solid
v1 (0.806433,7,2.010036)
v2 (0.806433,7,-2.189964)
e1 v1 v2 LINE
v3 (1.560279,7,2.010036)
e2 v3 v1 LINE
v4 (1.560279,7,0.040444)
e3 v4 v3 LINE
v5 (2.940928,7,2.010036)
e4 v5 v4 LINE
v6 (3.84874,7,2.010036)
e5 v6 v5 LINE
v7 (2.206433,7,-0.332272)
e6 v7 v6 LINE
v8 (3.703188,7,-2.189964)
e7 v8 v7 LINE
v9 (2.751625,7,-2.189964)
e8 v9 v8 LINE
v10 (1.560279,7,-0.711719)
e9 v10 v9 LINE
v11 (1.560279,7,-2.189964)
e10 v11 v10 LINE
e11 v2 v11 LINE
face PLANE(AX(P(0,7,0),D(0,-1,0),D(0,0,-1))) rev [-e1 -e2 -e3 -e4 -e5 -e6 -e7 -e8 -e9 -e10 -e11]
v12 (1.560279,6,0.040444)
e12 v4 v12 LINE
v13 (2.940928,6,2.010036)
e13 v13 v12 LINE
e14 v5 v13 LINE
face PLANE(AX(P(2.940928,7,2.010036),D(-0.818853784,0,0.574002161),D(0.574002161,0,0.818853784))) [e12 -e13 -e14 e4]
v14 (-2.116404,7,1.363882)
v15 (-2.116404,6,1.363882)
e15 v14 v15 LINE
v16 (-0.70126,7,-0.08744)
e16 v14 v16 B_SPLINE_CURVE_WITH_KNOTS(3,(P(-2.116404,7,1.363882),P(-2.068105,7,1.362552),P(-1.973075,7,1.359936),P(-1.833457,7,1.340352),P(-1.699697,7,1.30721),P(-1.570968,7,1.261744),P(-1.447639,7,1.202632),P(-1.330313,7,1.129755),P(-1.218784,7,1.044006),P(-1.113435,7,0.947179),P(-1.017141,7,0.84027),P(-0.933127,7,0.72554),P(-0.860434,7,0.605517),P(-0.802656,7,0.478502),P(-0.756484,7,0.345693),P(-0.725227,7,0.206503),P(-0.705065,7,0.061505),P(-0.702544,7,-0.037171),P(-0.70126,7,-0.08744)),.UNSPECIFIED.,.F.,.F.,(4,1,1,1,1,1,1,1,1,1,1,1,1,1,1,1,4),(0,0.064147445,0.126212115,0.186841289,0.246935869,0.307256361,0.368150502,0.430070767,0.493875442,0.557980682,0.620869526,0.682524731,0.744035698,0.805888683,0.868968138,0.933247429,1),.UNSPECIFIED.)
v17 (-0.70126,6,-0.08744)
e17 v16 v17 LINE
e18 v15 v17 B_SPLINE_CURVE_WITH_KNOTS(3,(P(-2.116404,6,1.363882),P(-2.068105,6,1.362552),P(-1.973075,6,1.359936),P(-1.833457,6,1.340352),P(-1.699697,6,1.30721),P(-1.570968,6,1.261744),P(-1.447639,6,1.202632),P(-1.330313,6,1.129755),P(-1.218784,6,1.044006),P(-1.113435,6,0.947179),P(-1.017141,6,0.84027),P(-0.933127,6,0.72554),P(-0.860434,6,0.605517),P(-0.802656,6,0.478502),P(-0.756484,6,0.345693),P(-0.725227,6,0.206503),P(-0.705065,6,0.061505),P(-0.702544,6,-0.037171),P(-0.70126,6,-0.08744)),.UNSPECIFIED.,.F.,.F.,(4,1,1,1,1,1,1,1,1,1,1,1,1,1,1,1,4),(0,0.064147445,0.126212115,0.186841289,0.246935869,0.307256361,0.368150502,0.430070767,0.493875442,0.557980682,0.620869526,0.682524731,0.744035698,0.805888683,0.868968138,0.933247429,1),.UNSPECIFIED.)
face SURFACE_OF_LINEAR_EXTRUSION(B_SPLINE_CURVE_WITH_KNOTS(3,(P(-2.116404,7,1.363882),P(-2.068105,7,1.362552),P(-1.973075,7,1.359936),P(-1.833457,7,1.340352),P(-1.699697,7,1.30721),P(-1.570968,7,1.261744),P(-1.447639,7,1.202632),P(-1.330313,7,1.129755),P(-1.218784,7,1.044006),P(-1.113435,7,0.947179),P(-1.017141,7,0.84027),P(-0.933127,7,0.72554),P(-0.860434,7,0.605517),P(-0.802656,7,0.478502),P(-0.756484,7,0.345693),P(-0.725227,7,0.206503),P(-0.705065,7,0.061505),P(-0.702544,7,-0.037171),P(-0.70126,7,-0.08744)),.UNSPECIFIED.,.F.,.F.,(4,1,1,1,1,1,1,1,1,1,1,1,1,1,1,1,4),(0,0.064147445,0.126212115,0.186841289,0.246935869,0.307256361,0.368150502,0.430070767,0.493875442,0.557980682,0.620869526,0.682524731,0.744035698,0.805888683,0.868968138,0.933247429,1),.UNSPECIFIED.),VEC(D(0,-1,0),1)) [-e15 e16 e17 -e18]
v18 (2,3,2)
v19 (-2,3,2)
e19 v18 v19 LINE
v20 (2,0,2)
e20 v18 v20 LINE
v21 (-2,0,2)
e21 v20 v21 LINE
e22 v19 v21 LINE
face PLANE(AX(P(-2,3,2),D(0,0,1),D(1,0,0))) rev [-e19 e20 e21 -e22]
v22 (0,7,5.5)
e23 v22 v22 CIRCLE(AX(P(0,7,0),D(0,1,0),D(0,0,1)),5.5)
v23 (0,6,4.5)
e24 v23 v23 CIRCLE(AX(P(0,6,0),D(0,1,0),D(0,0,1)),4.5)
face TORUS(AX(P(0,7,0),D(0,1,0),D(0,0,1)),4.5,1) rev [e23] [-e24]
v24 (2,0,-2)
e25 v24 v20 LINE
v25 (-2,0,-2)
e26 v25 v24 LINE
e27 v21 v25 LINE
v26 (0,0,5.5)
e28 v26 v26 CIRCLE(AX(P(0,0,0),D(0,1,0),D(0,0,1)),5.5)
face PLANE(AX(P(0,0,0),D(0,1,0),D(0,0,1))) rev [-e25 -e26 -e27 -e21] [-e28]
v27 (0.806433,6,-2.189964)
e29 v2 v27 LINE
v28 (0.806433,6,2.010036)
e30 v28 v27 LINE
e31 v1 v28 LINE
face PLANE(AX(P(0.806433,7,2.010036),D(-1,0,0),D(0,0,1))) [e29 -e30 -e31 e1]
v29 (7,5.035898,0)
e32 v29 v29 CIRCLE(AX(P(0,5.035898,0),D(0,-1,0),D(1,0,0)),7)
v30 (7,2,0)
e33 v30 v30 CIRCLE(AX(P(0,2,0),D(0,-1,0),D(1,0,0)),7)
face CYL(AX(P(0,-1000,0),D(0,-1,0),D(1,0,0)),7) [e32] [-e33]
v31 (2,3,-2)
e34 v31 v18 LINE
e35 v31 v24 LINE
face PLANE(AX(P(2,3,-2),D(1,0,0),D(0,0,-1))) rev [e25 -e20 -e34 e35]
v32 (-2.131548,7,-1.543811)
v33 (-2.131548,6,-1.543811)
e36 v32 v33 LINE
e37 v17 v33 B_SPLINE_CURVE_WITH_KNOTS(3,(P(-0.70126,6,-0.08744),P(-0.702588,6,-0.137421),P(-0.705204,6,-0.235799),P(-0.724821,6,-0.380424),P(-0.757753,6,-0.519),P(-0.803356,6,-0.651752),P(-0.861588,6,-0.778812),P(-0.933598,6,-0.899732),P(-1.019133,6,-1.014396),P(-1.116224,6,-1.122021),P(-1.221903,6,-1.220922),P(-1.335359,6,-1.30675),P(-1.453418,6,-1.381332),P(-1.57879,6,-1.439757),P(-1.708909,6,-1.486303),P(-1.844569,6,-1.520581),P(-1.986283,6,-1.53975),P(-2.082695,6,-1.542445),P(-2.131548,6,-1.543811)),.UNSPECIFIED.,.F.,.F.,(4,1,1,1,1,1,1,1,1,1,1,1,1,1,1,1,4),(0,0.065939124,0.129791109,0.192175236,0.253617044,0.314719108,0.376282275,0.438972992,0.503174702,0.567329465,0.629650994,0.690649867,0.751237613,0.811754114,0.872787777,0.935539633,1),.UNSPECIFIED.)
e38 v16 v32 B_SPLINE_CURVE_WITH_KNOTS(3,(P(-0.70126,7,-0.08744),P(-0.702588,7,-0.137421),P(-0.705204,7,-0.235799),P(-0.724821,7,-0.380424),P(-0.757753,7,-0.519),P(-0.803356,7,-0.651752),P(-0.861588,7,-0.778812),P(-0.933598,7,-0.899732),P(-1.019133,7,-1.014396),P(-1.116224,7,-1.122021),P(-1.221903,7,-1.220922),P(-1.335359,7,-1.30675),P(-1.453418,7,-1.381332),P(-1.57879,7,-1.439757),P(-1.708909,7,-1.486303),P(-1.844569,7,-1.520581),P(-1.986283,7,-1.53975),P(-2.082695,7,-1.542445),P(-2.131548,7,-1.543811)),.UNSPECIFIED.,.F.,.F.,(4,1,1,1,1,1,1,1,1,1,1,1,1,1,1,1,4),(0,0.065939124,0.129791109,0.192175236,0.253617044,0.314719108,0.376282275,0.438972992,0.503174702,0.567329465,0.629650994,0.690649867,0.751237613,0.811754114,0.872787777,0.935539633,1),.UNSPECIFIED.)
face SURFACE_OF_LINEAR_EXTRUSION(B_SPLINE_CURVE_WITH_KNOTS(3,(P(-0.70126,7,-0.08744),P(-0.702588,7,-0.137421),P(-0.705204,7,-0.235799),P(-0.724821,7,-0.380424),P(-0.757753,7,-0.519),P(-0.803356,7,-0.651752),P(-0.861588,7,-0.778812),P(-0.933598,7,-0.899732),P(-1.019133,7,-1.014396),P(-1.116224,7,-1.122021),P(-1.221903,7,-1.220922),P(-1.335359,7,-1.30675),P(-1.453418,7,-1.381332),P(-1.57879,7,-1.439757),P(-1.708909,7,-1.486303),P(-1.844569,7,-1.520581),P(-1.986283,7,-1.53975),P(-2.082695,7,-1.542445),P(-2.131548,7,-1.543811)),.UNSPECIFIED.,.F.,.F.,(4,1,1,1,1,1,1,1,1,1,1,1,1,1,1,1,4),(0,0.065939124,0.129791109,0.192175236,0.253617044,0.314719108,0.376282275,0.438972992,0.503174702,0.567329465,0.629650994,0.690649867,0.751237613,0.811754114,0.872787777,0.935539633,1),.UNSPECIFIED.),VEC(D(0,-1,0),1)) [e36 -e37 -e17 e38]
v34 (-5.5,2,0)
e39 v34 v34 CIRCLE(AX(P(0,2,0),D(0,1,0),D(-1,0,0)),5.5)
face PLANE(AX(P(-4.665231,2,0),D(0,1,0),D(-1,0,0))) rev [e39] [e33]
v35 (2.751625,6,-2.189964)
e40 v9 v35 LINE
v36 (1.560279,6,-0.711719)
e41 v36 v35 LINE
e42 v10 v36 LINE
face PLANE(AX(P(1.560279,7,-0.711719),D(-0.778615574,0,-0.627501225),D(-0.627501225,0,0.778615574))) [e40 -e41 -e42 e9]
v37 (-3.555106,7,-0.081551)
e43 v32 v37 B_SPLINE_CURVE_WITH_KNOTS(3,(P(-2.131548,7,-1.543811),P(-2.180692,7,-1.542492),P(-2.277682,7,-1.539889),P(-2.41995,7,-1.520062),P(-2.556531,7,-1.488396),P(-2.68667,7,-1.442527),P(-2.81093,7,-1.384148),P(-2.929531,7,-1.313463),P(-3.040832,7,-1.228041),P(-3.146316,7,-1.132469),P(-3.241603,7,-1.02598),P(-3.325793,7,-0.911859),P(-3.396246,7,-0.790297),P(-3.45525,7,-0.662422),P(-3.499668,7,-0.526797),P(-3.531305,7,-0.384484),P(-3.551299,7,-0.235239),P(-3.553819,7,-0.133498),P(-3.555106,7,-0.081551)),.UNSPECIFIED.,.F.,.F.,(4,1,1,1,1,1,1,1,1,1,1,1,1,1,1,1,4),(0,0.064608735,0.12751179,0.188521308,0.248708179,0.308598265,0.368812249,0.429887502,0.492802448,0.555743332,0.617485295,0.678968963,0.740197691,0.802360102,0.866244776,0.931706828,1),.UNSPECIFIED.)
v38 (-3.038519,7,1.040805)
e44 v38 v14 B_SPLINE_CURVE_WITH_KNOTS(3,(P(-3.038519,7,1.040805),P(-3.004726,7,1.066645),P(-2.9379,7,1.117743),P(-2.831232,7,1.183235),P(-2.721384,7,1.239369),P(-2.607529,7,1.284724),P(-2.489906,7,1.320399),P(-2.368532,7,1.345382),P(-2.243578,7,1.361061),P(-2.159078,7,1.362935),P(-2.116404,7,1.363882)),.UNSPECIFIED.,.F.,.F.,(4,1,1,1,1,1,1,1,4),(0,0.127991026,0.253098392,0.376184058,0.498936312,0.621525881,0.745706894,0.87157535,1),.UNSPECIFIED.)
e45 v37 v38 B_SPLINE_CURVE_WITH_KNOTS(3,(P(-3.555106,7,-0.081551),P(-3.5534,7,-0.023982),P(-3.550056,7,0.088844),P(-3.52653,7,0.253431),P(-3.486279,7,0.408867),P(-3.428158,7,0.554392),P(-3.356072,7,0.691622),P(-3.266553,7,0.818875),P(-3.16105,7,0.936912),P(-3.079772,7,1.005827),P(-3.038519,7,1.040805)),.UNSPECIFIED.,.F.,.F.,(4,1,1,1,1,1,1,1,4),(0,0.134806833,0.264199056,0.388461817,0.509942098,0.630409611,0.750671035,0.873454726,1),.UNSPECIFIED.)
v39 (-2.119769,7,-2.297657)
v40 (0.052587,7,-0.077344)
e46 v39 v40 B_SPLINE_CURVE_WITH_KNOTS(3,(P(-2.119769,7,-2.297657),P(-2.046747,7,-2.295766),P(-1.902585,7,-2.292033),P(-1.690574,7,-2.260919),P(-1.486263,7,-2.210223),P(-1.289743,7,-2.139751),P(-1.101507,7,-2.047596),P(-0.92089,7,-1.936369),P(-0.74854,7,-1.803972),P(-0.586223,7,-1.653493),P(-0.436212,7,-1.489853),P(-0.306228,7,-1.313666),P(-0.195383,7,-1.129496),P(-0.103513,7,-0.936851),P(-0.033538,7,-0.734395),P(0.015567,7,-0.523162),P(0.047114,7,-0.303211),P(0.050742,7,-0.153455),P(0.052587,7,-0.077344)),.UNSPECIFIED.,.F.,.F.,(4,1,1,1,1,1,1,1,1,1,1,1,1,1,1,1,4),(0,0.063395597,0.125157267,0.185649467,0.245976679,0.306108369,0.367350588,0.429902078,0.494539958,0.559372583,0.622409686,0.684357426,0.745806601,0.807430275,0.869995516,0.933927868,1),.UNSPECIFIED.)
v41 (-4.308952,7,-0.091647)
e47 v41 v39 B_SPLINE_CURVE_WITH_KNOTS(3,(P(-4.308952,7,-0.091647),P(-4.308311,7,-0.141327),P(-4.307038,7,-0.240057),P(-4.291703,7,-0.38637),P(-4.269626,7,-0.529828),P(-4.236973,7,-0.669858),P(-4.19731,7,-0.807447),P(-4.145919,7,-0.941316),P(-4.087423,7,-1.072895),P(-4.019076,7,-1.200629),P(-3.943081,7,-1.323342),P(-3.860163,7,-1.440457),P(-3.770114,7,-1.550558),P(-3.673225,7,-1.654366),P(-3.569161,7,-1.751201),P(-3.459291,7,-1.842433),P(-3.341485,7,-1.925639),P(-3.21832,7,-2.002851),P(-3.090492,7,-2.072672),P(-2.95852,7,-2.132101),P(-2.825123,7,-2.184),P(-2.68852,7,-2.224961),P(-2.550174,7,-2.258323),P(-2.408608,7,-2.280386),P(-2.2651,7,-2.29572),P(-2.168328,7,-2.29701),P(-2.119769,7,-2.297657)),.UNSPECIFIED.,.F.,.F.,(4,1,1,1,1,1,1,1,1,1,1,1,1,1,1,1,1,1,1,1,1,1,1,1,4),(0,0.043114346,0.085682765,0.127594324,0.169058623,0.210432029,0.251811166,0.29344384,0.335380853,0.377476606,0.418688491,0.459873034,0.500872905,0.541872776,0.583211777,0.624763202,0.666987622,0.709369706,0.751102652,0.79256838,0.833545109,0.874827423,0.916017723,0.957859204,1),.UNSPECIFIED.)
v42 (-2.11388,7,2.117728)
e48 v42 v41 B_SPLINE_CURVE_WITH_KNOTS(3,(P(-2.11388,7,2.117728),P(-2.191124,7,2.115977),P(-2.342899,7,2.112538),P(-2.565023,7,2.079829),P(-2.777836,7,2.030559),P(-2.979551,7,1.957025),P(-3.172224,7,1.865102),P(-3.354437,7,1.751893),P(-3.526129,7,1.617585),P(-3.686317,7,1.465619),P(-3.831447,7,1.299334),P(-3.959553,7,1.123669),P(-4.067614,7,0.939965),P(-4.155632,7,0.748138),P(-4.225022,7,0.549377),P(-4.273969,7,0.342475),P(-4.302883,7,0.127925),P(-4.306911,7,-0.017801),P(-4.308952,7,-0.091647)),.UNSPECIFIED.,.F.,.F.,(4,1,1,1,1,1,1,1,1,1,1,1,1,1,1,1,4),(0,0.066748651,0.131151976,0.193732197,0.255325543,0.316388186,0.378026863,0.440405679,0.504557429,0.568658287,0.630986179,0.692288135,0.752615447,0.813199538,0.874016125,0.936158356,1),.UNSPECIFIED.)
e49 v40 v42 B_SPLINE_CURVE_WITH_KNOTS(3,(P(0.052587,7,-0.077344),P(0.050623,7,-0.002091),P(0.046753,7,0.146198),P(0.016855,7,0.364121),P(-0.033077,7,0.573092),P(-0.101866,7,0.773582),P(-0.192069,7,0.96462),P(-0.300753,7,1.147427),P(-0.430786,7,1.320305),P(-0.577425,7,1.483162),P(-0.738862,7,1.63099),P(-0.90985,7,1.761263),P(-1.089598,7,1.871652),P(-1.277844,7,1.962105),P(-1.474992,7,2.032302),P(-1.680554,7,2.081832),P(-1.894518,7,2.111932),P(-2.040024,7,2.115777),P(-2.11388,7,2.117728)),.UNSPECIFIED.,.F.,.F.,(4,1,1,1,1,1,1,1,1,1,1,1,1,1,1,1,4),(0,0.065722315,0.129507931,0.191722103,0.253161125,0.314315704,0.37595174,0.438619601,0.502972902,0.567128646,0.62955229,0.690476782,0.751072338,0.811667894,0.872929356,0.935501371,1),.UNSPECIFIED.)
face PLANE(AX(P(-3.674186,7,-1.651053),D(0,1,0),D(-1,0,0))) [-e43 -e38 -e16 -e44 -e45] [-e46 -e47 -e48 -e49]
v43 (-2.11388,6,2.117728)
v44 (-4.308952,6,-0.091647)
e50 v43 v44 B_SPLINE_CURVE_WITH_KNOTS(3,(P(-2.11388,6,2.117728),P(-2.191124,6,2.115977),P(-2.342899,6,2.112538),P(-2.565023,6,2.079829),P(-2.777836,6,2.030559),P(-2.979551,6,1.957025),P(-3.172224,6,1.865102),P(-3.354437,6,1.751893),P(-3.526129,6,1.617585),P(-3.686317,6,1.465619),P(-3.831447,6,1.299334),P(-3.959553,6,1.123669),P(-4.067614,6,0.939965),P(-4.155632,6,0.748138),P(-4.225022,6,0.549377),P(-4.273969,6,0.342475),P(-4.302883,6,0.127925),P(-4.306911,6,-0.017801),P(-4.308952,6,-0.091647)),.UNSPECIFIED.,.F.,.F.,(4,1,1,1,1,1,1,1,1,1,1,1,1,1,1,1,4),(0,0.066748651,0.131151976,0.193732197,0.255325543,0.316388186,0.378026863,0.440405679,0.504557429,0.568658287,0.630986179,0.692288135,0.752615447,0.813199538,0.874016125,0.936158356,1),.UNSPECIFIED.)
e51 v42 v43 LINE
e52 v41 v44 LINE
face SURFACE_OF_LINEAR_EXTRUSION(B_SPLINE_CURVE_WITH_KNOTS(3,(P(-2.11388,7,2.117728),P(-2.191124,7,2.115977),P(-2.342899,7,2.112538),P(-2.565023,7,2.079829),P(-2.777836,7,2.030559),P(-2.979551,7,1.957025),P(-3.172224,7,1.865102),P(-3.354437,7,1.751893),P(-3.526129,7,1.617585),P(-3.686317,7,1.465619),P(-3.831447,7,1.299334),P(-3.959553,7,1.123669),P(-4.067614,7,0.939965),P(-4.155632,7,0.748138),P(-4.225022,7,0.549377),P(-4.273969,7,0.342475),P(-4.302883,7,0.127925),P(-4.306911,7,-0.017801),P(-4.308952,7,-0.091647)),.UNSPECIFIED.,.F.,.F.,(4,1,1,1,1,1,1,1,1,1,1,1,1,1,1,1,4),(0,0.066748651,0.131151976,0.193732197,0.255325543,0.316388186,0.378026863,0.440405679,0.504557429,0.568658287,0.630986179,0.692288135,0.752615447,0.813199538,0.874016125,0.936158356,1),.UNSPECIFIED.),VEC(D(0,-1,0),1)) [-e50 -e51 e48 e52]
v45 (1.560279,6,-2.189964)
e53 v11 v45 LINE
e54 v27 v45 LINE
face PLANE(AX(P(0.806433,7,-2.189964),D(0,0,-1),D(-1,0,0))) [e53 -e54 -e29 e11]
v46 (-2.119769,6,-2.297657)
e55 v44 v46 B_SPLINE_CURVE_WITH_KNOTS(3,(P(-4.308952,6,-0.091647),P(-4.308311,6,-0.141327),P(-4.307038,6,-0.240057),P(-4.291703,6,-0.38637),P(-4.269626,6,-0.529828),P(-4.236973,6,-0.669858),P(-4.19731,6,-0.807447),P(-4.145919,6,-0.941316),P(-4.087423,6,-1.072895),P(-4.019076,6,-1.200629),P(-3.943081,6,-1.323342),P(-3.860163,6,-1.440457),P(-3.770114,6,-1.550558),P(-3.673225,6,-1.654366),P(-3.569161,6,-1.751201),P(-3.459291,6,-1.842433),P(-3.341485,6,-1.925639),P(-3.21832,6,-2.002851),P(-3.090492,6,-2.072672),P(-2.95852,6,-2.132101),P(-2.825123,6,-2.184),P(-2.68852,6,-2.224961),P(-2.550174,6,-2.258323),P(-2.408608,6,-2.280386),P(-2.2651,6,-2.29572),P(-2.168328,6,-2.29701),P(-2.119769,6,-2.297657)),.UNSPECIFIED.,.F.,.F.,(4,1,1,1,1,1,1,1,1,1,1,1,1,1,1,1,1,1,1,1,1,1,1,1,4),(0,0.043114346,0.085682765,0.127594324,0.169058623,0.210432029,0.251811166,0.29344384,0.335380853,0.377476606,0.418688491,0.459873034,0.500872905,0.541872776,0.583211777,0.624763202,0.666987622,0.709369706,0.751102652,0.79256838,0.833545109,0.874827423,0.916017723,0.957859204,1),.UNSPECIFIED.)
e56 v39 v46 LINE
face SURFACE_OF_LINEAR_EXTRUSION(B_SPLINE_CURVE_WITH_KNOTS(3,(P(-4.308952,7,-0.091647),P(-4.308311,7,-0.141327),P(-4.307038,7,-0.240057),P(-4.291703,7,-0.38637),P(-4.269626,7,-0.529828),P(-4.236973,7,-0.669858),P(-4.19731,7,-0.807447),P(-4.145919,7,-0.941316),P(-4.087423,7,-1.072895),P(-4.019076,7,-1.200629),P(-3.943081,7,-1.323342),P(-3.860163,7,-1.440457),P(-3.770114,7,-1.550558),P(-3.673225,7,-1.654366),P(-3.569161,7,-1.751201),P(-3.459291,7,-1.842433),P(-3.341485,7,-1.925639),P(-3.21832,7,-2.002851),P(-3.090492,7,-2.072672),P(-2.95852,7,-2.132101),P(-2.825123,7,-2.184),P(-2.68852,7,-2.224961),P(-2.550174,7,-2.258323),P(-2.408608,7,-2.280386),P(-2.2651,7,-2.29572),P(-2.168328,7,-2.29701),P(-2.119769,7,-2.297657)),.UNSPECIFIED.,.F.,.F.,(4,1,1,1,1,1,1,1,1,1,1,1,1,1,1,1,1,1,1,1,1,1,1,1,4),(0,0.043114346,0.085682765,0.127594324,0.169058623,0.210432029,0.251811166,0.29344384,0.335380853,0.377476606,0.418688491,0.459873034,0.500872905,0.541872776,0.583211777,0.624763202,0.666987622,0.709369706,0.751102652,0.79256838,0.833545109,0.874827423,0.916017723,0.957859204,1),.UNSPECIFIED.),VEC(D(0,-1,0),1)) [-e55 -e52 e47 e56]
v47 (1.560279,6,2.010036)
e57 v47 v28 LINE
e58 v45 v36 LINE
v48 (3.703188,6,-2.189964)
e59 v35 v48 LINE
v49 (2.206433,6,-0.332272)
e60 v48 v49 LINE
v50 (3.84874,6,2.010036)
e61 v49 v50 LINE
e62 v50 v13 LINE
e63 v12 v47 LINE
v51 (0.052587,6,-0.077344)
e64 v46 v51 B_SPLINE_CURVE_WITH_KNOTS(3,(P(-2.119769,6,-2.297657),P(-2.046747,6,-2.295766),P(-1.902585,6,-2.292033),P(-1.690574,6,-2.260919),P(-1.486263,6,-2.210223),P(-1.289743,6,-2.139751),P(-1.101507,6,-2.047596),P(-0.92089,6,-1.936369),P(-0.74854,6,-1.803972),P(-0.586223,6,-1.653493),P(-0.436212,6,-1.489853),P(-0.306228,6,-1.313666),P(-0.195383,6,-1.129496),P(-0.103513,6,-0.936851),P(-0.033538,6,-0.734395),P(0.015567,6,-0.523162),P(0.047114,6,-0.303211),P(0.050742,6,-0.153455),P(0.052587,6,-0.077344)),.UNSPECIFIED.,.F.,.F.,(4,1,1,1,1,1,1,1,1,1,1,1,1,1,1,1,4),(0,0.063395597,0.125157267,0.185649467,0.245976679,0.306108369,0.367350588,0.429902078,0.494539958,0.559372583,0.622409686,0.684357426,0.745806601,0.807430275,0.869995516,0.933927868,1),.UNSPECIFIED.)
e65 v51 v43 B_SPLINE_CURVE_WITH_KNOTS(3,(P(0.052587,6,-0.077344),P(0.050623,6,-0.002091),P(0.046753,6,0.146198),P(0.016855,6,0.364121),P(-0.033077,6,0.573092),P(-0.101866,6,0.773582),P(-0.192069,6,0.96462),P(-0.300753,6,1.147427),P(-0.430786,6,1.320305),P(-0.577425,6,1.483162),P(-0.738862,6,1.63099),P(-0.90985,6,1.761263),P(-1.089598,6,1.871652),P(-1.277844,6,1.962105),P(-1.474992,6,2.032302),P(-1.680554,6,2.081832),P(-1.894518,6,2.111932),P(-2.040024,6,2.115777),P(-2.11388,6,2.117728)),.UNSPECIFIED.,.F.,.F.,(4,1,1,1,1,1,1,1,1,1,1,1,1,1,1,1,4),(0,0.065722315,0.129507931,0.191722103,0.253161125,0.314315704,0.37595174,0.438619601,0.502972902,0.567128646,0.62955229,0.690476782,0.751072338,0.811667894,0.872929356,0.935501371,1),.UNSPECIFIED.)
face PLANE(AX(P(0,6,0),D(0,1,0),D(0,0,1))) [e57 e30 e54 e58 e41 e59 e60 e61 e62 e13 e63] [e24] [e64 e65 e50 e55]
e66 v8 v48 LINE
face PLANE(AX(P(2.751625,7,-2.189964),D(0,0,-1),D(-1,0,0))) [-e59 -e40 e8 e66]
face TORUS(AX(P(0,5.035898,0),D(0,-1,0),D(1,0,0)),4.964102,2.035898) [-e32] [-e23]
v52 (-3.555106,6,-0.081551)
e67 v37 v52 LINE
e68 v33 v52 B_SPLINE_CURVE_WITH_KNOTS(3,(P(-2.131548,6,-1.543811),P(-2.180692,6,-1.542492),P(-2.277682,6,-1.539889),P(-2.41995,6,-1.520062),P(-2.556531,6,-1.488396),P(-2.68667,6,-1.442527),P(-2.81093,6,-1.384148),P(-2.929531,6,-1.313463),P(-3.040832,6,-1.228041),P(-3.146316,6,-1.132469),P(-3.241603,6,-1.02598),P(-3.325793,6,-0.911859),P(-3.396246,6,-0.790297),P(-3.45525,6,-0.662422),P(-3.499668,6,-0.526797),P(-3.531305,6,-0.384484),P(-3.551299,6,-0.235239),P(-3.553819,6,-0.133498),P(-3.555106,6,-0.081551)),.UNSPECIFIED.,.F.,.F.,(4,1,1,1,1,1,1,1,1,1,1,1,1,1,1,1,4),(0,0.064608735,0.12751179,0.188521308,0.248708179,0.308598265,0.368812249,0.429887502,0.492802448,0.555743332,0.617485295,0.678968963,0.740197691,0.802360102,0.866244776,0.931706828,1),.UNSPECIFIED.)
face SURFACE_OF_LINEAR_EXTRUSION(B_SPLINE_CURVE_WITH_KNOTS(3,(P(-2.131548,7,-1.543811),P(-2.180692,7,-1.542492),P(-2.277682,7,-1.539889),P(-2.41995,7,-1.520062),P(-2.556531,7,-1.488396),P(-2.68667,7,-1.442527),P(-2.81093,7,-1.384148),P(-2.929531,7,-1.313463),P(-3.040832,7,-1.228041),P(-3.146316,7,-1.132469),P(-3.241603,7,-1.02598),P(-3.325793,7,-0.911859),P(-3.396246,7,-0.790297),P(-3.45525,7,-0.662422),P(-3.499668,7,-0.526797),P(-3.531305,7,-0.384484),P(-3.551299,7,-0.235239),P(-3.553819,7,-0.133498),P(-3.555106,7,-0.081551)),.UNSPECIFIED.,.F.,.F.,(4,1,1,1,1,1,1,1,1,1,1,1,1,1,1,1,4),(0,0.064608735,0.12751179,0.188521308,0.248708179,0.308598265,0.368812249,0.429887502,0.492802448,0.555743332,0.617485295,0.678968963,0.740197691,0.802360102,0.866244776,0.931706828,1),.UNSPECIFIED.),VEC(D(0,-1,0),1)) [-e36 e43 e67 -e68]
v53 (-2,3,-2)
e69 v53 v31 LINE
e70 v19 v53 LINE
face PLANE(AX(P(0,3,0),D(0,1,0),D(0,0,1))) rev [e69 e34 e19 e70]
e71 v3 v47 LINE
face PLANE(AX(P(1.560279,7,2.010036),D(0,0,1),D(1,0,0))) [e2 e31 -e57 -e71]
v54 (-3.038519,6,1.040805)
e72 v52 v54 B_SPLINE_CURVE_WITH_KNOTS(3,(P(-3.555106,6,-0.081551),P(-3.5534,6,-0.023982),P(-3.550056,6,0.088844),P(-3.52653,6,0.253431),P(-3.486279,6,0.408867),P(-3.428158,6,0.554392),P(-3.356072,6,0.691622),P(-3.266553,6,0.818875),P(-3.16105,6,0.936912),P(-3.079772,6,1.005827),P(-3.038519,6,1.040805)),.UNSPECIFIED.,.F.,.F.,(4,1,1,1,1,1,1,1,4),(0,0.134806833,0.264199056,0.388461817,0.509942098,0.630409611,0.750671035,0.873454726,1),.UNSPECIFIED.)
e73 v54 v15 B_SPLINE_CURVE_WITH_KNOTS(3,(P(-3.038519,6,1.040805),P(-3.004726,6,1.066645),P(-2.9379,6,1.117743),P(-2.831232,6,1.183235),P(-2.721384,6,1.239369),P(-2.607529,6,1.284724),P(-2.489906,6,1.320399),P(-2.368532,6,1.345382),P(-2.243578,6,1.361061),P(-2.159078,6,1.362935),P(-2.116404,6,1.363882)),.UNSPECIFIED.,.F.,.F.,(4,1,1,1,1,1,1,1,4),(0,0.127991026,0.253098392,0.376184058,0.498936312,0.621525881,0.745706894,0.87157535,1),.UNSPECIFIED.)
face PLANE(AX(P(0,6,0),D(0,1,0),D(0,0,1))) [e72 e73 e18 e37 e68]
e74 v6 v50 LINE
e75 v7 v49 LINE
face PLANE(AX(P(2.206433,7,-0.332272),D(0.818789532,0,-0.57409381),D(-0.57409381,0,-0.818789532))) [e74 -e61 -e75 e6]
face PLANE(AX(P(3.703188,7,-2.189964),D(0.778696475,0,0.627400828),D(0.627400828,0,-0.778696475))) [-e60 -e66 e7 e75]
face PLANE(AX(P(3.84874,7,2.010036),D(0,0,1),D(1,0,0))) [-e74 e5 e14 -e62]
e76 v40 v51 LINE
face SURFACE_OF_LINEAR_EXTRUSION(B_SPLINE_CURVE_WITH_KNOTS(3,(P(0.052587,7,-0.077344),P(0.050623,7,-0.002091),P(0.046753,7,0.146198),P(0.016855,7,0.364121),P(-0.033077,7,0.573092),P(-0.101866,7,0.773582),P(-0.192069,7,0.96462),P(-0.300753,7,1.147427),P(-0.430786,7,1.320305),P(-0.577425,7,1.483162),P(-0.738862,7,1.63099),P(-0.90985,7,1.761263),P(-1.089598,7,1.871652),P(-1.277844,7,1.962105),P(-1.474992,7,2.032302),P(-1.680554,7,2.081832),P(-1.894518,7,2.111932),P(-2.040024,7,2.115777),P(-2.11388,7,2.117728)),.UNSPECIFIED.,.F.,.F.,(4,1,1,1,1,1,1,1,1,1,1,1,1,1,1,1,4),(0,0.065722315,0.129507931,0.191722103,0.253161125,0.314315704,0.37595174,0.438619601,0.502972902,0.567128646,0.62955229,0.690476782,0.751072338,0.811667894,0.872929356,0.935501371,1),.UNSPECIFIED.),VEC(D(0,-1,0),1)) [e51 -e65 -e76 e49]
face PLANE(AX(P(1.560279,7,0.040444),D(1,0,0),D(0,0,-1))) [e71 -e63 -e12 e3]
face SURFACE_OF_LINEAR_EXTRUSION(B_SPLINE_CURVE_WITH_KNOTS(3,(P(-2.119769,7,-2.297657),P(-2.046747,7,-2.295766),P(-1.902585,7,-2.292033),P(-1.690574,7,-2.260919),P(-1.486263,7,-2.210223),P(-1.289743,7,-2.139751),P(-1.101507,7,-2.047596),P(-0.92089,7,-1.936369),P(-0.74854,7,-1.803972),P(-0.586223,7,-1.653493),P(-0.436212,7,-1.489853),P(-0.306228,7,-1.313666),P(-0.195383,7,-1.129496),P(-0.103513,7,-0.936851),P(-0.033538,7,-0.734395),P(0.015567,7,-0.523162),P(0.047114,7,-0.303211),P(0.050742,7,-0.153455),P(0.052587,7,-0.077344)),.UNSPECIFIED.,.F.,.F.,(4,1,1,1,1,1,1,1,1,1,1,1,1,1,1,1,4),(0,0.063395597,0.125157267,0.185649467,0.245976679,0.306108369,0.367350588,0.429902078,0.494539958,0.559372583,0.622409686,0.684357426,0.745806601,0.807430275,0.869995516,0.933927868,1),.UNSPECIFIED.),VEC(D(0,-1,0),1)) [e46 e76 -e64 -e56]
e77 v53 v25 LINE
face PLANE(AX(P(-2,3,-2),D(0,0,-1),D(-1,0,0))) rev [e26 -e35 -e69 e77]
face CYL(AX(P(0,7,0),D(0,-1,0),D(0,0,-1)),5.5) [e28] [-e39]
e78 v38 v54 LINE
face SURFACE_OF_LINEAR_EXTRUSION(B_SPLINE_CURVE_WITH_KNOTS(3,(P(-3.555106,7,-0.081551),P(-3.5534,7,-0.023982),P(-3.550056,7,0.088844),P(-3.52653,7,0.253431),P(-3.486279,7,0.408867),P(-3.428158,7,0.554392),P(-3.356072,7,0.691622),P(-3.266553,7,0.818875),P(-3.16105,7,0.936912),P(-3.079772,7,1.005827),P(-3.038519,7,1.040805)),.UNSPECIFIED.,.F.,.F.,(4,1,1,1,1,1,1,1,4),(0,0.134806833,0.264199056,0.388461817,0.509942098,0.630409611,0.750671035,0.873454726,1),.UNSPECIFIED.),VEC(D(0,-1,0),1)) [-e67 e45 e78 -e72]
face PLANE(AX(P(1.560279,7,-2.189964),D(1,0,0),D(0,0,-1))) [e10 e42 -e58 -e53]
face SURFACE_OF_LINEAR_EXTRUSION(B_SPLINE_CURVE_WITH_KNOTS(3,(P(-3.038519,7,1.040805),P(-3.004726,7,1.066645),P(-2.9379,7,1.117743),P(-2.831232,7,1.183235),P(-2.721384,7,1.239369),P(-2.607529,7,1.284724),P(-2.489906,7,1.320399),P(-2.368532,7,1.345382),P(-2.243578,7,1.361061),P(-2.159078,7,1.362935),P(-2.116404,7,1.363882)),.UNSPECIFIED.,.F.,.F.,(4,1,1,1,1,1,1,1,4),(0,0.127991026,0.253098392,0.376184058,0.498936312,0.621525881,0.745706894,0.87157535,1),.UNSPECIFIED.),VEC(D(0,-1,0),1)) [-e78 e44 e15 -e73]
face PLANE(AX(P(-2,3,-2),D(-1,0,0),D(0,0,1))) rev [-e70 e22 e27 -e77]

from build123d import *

# Parameters (mm, degrees)
SKETCH_1_R          = 5.5
EXTRUDE_1_DEPTH     = 7
CUT_EXTRUDE_START   = -1
SKETCH_2_R          = 5.5
CUT_EXTRUDE_1_DEPTH = 1
EXTRUDE_2_DEPTH     = 1
SKETCH_5_W          = 4
SKETCH_5_H          = 4
CUT_EXTRUDE_2_DEPTH = 3
FILLET_3_R          = 1


with BuildPart() as part:
    # Эскиз1 → Бобышка-Вытянуть1 (new body)
    with BuildSketch(Plane(origin=(0, 0, 0), x_dir=(1, 0, 0), z_dir=(0, 1, 0))):
        with Locations(Location((0, 0, 0), (0, 0, 270))):
            Circle(SKETCH_1_R)
    extrude(amount=EXTRUDE_1_DEPTH)

    # Эскиз6 → Повернуть3 (revolve)
    with BuildSketch(Plane.XY, mode=Mode.PRIVATE) as revolve_3_sk:
        with BuildLine():
            Line((-4.665230635, 2), (-7, 2))
            Line((-7, 2), (-7, 3))
            Line((-7, 3), (-7, 5.035898385))
            ThreePointArc((-7, 5.035898385), (-6.582112259, 6.271585962), (-5.5, 7))
            Line((-5.5, 7), (-4.665230635, 7))
            Line((-4.665230635, 7), (-4.665230635, 3))
            Line((-4.665230635, 3), (-4.665230635, 2))
        make_face()
    revolve(revolve_3_sk.sketch.rotate(Axis((0, -1000, 0), (0, 1, 0)), 180), axis=Axis((0, -1000, 0), (0, 1, 0)))

    # Эскиз2 → Вырез-Вытянуть1 (cut)
    with BuildSketch(Plane(origin=(0, 7, 0), x_dir=(1, 0, 0), z_dir=(0, 1, 0)).offset(CUT_EXTRUDE_START)):
        with Locations(Location((0, 0, 0), (0, 0, 180))):
            Circle(SKETCH_2_R)
    extrude(amount=CUT_EXTRUDE_1_DEPTH, mode=Mode.SUBTRACT)

    # Эскиз3 → Бобышка-Вытянуть2 (add)
    # profile 1 of 2: a face of its own
    with BuildSketch(Plane(origin=(0, 6, 0), x_dir=(1, 0, 0), z_dir=(0, 1, 0))):
        with BuildLine():
            add(Edge.make_bspline(
                [(-2.119769226, 2.297656666), (-2.046747078, 2.295765991), (-1.90258482, 2.292033372), (-1.690574161, 2.26091908), (-1.486262691, 2.2102228), (-1.289742798, 2.139751305), (-1.101506546, 2.047595868), (-0.920889962, 1.936369156), (-0.748540006, 1.803971831), (-0.586222783, 1.653492505), (-0.436212395, 1.489852809), (-0.306228306, 1.313665584), (-0.195382643, 1.129496016), (-0.103513461, 0.936850619), (-0.03353798, 0.734395232), (0.01556671, 0.523162109), (0.04711404, 0.303211345), (0.050742469, 0.153454853), (0.052586544, 0.077344166)],
                knots=[0, 0, 0, 0, 1.014329547, 2.002516266, 2.970391464, 3.935626869, 4.897733899, 5.877609409, 6.878433252, 7.912639331, 8.949961323, 9.958554974, 10.949718813, 11.932905612, 12.9188844, 13.919928257, 14.942845884, 16, 16, 16, 16], degree=3))
            add(Edge.make_bspline(
                [(0.052586544, 0.077344166), (0.050622684, 0.002091069), (0.046752835, -0.146197571), (0.01685461, -0.364121403), (-0.033077009, -0.573091779), (-0.101865651, -0.773581708), (-0.192068673, -0.964620087), (-0.300752725, -1.147426668), (-0.430785771, -1.320304963), (-0.577424997, -1.483162198), (-0.738862058, -1.630990084), (-0.909849534, -1.761263154), (-1.08959791, -1.871651637), (-1.277844091, -1.96210497), (-1.474991763, -2.032302471), (-1.680553946, -2.081831908), (-1.894517921, -2.111931947), (-2.040023801, -2.115776519), (-2.113879803, -2.11772795)],
                knots=[0, 0, 0, 0, 1.051557043, 2.072126891, 3.067553643, 4.050577992, 5.02905126, 6.015227836, 7.017913613, 8.04756643, 9.074058332, 10.072836633, 11.047628519, 12.017157415, 12.98668631, 13.966869689, 14.968021931, 16, 16, 16, 16], degree=3))
            add(Edge.make_bspline(
                [(-2.113879803, -2.11772795), (-2.191124325, -2.11597742), (-2.342899253, -2.112537868), (-2.565022539, -2.079829301), (-2.777835841, -2.030558773), (-2.979551403, -1.957025153), (-3.172223527, -1.865101945), (-3.354436593, -1.751893002), (-3.526129367, -1.617585413), (-3.68631699, -1.465618843), (-3.831447364, -1.299334085), (-3.959553386, -1.123668983), (-4.067613658, -0.939965466), (-4.155632133, -0.748137555), (-4.225022363, -0.549377415), (-4.273969286, -0.342474539), (-4.302883401, -0.127925156), (-4.30691097, 0.017801074), (-4.308951918, 0.09164705)],
                knots=[0, 0, 0, 0, 1.067978421, 2.098431617, 3.099715153, 4.085208694, 5.062210972, 6.048429807, 7.046490867, 8.072918869, 9.098532598, 10.095778865, 11.076610158, 12.041847152, 13.011192615, 13.984257998, 14.978533688, 16, 16, 16, 16], degree=3))
            add(Edge.make_bspline(
                [(-4.308951918, 0.09164705), (-4.308311351, 0.141326757), (-4.307038327, 0.240057111), (-4.291703421, 0.386370456), (-4.269625564, 0.529827961), (-4.236973461, 0.669857659), (-4.197309501, 0.807447394), (-4.145919239, 0.941316447), (-4.087423212, 1.072894908), (-4.019076113, 1.200628669), (-3.943080748, 1.323342475), (-3.860163038, 1.440457461), (-3.770114489, 1.550557538), (-3.673225176, 1.654366237), (-3.569161205, 1.751201216), (-3.459291432, 1.842433309), (-3.341485021, 1.925639068), (-3.218320386, 2.002850542), (-3.0904919, 2.072671539), (-2.958519942, 2.132101084), (-2.825123394, 2.183999893), (-2.688520259, 2.224960728), (-2.550174481, 2.2583229), (-2.408608118, 2.280385876), (-2.265100139, 2.295720358), (-2.16832783, 2.297009698), (-2.119769226, 2.297656666)],
                knots=[0, 0, 0, 0, 1.034744296, 2.056386356, 3.06226378, 4.057406941, 5.050368692, 6.043467995, 7.042652155, 8.049140477, 9.059438543, 10.048523776, 11.036952808, 12.020949711, 13.004946614, 13.997082645, 14.994316842, 16.007702937, 17.024872941, 18.026463647, 19.021641123, 20.005082605, 20.995858141, 21.984425357, 22.988620895, 24, 24, 24, 24], degree=3))
        make_face()
        with BuildLine():
            add(Edge.make_bspline(
                [(-2.131548072, 1.543810512), (-2.180691967, 1.542491871), (-2.277682351, 1.539889401), (-2.419949581, 1.520062101), (-2.556531146, 1.48839565), (-2.686669921, 1.442527182), (-2.810929937, 1.384148264), (-2.92953147, 1.313462878), (-3.040832134, 1.228041294), (-3.146316015, 1.132469416), (-3.241603344, 1.02598038), (-3.325792705, 0.911859268), (-3.39624564, 0.790296659), (-3.455250415, 0.662421843), (-3.499667933, 0.5267969), (-3.531305199, 0.384484194), (-3.55129877, 0.235238516), (-3.553818985, 0.133497931), (-3.555105764, 0.081550896)],
                knots=[0, 0, 0, 0, 1.033739768, 2.040188636, 3.016340934, 3.979330865, 4.937572243, 5.900995986, 6.878200029, 7.884839167, 8.891893314, 9.879764717, 10.863503415, 11.843163062, 12.837761627, 13.859916423, 14.907309254, 16, 16, 16, 16], degree=3))
            add(Edge.make_bspline(
                [(-3.555105764, 0.081550896), (-3.553399691, 0.023981897), (-3.550056071, -0.088843804), (-3.526529955, -0.253430896), (-3.48627911, -0.408867069), (-3.428157674, -0.554392109), (-3.356071845, -0.691621961), (-3.266552686, -0.818874678), (-3.161049983, -0.936912192), (-3.079771556, -1.005827408), (-3.038519226, -1.040804873)],
                knots=[0, 0, 0, 0, 1.078454662, 2.113592447, 3.107694534, 4.079536787, 5.043276885, 6.005368276, 6.987637804, 8, 8, 8, 8], degree=3))
            add(Edge.make_bspline(
                [(-3.038519226, -1.040804873), (-3.004725691, -1.06664488), (-2.937899997, -1.117742715), (-2.83123164, -1.183235073), (-2.721384236, -1.239368557), (-2.607528848, -1.284723748), (-2.489905935, -1.320399379), (-2.368531624, -1.345382437), (-2.243577894, -1.361061466), (-2.159078326, -1.362935407), (-2.116403841, -1.363881796)],
                knots=[0, 0, 0, 0, 1.023928204, 2.024787132, 3.009472467, 3.9914905, 4.972207045, 5.96565515, 6.972602802, 8, 8, 8, 8], degree=3))
            add(Edge.make_bspline(
                [(-2.116403841, -1.363881796), (-2.068104976, -1.362551974), (-1.97307544, -1.359935508), (-1.833456591, -1.340352294), (-1.699697494, -1.307210424), (-1.570967759, -1.26174433), (-1.447638587, -1.202632414), (-1.330312721, -1.12975459), (-1.218784456, -1.044005703), (-1.11343496, -0.947178757), (-1.01714054, -0.840270228), (-0.933126865, -0.725540405), (-0.860433879, -0.60551713), (-0.802656109, -0.478501656), (-0.756483756, -0.345692949), (-0.725227261, -0.206502827), (-0.705064789, -0.061505087), (-0.702543864, 0.037171), (-0.70125961, 0.087440319)],
                knots=[0, 0, 0, 0, 1.026359118, 2.019393844, 2.989460624, 3.950973911, 4.916101784, 5.890408035, 6.881132271, 7.902007068, 8.92769091, 9.933912415, 10.920395702, 11.90457117, 12.894218921, 13.903490204, 14.931958862, 16, 16, 16, 16], degree=3))
            add(Edge.make_bspline(
                [(-0.70125961, 0.087440319), (-0.7025883, 0.137420576), (-0.705203622, 0.235799089), (-0.724821305, 0.380424042), (-0.757752997, 0.518999679), (-0.803355621, 0.651752311), (-0.861587756, 0.778812083), (-0.933597699, 0.899732178), (-1.019132775, 1.014395696), (-1.1162244, 1.12202125), (-1.221902667, 1.22092224), (-1.335358845, 1.30675032), (-1.453418304, 1.381332193), (-1.578789904, 1.439756621), (-1.708908647, 1.486303239), (-1.844568523, 1.520580836), (-1.986283354, 1.539750113), (-2.082694884, 1.542444981), (-2.131548072, 1.543810512)],
                knots=[0, 0, 0, 0, 1.055025985, 2.07665775, 3.074803781, 4.057872707, 5.035505728, 6.020516407, 7.023567878, 8.050795229, 9.077271434, 10.074415901, 11.050397877, 12.019801805, 12.988065821, 13.964604439, 14.968634123, 16, 16, 16, 16], degree=3))
        make_face(mode=Mode.SUBTRACT)
    # profile 2 of 2: a face of its own
    with BuildSketch(Plane(origin=(0, 6, 0), x_dir=(1, 0, 0), z_dir=(0, 1, 0))):
        Polygon((0.806432697, 2.189964358), (1.560278851, 2.189964358), (1.560278851, 0.711719166), (2.751625005, 2.189964358), (3.703187505, 2.189964358), (2.206432697, 0.33227205), (3.84874039, -2.010035642), (2.94092789, -2.010035642), (1.560278851, -0.040444296), (1.560278851, -2.010035642), (0.806432697, -2.010035642), align=None)
    extrude(amount=EXTRUDE_2_DEPTH)

    # Эскиз5 → Вырез-Вытянуть2 (cut)
    with BuildSketch(Plane.XZ):
        Rectangle(SKETCH_5_W, SKETCH_5_H)
    extrude(amount=-CUT_EXTRUDE_2_DEPTH, mode=Mode.SUBTRACT)

    # Скругление3
    fillet_3_edges = [part.edges().sort_by_distance(p)[0] for p in [
        (5.5, 6, 0),
    ]]
    fillet(fillet_3_edges, radius=FILLET_3_R - 0.0001)  # a hair under: the kernel refuses the full size


solid = part.part
